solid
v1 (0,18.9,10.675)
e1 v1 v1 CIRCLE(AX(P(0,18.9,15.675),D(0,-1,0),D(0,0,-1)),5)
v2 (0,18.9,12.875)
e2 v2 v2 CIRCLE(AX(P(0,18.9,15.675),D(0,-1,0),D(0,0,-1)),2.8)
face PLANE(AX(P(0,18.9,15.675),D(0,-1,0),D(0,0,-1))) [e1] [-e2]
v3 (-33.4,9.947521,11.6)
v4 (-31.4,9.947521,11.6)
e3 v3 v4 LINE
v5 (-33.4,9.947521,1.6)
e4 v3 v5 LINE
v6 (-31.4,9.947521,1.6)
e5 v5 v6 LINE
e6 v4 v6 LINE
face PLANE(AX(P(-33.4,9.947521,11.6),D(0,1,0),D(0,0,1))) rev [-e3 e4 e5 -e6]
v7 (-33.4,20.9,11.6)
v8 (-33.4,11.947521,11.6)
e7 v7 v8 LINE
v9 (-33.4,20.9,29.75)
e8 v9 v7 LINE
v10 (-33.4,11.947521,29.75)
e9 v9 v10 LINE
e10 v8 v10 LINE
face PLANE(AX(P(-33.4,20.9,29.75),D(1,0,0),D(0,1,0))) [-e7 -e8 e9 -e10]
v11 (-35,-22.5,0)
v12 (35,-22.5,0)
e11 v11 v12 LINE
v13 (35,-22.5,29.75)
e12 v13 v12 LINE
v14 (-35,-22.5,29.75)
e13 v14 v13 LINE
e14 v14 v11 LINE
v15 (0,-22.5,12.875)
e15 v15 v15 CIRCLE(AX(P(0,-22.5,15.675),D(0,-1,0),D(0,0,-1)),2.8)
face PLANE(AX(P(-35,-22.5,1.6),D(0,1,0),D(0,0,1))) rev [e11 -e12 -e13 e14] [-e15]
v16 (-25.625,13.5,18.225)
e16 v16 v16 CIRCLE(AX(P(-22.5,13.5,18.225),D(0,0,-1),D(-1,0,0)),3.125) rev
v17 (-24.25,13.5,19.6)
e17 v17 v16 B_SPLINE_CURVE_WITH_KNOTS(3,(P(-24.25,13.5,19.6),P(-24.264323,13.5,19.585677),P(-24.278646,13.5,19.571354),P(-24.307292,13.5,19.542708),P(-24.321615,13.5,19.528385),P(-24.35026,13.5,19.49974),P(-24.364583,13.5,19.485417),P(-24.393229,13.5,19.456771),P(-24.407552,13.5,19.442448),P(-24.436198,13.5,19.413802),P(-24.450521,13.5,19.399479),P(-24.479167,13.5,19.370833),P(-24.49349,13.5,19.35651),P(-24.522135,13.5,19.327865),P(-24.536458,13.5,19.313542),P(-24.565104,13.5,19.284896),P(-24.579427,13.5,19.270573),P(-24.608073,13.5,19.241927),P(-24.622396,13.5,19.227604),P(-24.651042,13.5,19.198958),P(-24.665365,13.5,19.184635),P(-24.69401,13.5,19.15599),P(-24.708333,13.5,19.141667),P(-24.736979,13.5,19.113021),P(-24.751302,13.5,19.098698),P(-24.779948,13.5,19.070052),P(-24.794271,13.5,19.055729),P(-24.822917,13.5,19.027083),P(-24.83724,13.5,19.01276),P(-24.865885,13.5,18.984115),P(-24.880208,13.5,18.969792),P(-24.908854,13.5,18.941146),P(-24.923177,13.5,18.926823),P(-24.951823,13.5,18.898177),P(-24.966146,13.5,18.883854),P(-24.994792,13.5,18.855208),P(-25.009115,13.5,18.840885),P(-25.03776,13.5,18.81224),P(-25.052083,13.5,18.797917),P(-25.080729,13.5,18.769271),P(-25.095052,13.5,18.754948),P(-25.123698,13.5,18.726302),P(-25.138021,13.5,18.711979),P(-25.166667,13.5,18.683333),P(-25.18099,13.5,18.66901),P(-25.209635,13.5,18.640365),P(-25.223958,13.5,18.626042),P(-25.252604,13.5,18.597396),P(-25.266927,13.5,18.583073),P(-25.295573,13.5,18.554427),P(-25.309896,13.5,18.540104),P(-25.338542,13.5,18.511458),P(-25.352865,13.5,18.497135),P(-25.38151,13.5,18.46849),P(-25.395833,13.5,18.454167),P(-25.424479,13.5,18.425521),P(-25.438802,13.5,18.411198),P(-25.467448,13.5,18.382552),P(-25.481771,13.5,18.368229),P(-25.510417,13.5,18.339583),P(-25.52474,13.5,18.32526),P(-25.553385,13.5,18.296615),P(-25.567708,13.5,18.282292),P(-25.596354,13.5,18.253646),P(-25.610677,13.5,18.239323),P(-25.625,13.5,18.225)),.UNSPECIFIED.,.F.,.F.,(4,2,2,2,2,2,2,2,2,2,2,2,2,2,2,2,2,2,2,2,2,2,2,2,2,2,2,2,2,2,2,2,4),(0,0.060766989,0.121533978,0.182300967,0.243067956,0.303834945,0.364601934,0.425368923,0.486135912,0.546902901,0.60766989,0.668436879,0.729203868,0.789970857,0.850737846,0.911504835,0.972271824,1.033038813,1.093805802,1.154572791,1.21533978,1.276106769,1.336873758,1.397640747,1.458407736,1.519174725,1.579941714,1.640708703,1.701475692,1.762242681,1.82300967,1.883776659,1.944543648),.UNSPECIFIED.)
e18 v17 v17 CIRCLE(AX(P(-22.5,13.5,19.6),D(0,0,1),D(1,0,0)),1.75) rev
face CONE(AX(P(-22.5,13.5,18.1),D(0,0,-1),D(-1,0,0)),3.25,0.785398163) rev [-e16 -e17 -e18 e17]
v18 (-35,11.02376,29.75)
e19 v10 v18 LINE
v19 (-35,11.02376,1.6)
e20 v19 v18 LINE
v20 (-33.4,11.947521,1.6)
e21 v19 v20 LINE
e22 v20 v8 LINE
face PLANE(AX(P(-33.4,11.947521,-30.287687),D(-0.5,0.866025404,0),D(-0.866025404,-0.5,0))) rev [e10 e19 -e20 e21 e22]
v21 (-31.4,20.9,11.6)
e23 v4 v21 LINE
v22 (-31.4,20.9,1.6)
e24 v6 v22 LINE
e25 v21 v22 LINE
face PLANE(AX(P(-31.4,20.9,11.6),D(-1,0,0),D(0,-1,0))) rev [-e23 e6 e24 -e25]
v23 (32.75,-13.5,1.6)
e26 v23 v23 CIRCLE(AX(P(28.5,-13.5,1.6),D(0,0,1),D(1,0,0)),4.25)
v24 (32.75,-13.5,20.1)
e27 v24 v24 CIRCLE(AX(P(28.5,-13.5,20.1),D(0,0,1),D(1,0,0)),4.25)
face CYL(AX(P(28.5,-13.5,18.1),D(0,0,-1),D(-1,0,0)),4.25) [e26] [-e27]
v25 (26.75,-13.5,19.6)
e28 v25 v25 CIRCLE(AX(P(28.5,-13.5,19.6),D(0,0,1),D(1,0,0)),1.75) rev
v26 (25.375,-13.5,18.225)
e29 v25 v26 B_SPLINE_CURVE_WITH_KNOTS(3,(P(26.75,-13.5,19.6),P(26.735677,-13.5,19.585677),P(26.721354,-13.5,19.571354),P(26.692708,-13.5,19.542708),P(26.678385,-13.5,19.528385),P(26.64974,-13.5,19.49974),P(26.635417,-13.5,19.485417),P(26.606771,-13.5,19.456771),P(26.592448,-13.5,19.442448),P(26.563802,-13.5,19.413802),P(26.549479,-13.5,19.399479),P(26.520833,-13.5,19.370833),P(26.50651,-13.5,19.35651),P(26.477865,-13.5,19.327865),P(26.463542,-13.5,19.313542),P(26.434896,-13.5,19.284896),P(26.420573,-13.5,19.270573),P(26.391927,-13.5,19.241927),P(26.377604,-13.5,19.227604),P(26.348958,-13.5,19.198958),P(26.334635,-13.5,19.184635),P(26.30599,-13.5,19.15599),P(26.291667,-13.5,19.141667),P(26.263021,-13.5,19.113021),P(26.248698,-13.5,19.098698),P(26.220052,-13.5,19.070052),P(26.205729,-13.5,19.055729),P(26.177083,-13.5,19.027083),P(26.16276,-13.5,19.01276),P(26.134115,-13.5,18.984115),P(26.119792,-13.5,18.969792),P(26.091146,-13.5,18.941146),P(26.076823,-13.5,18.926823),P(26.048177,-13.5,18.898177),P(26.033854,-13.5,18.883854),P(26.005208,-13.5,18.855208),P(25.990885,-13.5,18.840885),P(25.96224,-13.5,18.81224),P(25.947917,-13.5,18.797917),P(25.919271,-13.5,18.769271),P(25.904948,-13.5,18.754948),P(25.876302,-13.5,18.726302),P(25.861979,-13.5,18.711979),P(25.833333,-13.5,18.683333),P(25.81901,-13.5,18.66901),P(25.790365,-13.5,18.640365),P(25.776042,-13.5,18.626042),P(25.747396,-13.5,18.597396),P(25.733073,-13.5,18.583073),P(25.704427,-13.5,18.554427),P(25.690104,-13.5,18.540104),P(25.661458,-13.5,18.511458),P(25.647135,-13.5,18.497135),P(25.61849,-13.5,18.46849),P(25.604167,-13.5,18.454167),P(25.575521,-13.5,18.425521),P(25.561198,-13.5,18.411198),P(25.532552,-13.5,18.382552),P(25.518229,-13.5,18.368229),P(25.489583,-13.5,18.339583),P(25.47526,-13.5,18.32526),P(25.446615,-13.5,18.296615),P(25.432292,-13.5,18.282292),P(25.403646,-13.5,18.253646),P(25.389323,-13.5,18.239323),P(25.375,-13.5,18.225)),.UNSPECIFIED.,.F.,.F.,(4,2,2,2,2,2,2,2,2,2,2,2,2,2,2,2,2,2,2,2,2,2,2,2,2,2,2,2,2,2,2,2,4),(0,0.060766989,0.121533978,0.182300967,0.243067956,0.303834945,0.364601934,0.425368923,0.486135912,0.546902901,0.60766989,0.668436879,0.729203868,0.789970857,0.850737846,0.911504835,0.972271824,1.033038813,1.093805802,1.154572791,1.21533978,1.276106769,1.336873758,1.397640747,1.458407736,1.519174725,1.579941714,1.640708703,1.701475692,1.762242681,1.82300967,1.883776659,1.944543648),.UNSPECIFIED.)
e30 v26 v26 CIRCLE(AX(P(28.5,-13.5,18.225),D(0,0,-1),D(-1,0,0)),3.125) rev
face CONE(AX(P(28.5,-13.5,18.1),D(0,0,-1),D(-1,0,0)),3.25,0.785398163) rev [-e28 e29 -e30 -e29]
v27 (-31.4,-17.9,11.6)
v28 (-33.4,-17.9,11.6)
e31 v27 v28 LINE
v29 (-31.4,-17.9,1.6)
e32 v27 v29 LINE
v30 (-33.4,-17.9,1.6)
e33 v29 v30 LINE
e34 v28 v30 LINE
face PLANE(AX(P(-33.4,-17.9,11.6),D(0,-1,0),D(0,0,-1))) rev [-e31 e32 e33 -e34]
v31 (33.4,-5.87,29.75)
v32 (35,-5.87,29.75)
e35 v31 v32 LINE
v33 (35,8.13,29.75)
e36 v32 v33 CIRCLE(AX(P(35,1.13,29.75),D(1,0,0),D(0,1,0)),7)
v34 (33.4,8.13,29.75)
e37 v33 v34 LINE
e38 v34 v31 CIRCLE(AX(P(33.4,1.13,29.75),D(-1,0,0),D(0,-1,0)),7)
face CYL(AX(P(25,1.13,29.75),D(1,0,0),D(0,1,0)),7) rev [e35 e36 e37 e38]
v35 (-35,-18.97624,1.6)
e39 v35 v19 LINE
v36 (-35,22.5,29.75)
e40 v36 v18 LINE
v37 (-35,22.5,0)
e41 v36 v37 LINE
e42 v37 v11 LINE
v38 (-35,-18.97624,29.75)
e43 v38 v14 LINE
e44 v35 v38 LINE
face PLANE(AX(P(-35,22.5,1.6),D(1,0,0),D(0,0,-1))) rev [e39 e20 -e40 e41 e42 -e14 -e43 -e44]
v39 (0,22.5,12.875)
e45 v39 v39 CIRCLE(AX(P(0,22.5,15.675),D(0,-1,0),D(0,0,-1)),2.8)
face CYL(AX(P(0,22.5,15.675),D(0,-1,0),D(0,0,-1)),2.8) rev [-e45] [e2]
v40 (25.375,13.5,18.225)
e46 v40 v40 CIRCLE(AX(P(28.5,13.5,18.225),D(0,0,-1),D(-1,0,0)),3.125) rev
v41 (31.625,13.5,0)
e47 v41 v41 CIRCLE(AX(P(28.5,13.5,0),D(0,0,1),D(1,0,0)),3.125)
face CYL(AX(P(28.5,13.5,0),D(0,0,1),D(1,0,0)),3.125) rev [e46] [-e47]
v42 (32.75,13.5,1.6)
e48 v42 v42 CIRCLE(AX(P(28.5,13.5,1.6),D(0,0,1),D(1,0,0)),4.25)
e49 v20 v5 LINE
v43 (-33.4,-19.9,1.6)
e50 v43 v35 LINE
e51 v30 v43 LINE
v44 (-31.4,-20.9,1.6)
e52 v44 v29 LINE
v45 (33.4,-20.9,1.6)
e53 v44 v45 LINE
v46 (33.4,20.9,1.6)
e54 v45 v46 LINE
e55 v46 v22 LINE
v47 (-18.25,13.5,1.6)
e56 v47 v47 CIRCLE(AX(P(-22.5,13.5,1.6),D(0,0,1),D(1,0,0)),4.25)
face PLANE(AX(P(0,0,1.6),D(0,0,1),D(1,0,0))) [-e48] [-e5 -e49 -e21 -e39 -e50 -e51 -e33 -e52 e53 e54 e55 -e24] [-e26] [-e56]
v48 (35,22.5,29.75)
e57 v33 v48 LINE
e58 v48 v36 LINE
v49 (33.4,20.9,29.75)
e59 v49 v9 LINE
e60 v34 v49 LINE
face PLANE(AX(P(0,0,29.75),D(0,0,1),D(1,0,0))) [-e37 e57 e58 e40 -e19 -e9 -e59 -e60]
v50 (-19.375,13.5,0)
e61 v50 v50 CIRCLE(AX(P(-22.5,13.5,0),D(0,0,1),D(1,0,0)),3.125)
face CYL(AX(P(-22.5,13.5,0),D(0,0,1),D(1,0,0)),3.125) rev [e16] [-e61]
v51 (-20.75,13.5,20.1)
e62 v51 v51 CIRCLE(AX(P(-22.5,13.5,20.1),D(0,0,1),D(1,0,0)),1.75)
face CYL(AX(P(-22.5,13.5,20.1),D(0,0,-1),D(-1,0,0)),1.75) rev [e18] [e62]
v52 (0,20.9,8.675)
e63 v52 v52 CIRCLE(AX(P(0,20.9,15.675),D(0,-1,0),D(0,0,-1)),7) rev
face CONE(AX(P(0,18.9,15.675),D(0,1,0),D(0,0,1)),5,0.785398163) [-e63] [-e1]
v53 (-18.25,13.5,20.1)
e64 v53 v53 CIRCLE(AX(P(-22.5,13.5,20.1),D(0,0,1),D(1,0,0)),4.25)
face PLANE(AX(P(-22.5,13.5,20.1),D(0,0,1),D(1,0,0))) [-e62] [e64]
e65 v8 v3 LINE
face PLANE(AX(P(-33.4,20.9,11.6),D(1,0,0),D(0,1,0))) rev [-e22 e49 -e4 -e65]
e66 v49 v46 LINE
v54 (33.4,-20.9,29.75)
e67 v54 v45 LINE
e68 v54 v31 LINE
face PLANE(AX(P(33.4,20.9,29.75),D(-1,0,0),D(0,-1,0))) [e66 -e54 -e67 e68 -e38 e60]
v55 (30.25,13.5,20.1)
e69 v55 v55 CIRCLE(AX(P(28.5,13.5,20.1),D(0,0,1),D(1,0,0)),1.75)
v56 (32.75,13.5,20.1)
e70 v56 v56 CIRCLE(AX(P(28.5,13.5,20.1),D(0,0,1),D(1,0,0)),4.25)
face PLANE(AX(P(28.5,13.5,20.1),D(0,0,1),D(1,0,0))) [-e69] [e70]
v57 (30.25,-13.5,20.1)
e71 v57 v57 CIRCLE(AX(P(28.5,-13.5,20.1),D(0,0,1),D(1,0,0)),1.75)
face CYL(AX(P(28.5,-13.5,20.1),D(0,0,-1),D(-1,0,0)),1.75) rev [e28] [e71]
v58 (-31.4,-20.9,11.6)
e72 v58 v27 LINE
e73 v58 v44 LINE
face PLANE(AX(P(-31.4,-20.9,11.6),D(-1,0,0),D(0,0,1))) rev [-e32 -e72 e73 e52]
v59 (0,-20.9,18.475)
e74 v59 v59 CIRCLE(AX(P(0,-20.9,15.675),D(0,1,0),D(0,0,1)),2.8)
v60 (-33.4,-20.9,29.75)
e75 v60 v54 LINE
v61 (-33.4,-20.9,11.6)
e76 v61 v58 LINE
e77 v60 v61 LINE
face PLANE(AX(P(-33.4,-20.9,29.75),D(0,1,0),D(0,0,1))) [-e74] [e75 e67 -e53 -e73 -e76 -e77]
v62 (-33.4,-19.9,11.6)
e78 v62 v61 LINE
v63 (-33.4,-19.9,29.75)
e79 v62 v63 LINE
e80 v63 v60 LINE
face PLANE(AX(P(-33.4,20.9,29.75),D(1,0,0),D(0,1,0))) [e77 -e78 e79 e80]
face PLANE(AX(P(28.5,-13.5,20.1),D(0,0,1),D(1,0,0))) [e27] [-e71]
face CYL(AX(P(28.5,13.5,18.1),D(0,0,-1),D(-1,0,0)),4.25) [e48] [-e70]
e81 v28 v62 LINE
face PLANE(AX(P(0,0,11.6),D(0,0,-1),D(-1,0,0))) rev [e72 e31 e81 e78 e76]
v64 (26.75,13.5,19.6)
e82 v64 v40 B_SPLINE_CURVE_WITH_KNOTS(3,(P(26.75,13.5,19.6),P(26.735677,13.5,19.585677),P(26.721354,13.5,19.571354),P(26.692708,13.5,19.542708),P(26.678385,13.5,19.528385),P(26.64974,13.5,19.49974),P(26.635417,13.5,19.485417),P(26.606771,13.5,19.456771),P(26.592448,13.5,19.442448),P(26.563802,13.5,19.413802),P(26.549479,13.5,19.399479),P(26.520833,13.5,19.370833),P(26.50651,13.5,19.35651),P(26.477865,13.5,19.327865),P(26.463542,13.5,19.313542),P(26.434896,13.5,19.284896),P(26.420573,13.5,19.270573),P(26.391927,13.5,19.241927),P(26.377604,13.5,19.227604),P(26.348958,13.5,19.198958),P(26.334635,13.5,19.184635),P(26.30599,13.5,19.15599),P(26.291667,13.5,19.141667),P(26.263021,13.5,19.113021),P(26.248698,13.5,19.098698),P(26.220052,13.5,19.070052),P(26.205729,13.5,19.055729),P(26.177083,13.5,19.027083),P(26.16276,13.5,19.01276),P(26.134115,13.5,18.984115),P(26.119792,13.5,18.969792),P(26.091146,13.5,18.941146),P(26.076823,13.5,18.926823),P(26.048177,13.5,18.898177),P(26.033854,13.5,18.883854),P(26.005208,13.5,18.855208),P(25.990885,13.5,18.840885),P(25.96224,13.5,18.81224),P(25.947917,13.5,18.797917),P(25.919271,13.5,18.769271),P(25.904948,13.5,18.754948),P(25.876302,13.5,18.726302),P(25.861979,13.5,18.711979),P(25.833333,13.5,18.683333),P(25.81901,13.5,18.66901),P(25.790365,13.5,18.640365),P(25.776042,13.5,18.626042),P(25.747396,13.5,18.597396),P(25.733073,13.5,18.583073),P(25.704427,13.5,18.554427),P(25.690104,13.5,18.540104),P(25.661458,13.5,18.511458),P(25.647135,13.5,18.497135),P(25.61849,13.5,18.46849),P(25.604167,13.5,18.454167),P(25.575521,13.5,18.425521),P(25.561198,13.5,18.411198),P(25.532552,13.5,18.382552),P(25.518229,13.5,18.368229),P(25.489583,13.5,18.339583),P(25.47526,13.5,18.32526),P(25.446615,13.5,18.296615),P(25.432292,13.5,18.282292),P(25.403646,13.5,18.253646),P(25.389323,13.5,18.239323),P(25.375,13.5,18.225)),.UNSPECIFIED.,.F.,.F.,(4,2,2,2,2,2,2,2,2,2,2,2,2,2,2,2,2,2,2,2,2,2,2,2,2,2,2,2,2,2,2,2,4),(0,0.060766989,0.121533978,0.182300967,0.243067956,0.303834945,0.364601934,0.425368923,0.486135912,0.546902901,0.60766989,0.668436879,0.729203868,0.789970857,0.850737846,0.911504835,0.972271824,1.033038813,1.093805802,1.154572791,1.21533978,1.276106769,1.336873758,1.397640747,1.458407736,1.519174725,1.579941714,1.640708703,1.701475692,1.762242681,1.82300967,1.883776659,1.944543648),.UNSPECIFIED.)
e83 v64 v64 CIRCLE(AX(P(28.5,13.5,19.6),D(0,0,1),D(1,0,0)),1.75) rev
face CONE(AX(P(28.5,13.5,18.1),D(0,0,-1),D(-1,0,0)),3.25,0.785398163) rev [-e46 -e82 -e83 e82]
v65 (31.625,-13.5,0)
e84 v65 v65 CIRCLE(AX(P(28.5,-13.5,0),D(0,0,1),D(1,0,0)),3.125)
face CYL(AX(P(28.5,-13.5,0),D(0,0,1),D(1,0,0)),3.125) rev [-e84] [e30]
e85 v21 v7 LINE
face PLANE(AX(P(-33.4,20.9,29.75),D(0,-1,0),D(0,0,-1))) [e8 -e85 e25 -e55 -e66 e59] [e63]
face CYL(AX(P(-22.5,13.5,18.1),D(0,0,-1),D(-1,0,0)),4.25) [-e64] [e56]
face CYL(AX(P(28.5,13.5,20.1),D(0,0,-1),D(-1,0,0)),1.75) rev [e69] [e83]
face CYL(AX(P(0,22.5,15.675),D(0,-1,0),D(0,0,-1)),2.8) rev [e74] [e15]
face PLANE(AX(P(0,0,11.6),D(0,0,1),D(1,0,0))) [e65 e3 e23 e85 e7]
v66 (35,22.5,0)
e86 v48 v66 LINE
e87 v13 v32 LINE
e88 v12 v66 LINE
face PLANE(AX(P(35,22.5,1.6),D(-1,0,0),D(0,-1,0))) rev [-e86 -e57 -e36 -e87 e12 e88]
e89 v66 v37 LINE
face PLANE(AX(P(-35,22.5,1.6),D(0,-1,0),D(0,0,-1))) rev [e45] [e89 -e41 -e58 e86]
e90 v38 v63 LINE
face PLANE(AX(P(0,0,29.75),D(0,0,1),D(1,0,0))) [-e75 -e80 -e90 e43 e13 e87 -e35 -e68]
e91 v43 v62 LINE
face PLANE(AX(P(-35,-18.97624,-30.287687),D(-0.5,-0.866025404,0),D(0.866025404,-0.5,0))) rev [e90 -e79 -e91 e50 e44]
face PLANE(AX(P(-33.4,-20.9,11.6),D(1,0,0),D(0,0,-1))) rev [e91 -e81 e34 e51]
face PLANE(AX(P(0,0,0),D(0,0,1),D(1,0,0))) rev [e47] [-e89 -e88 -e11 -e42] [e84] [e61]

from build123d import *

# Parameters (mm, degrees)
SKETCH2_W               = 70
SKETCH2_H               = 45
BOSS_EXTRUDE1_DEPTH     = 1.6
SKETCH3_R               = 3.125
CUT_EXTRUDE1_DEPTH      = 1.6
SKETCH4_W               = 70
SKETCH4_H               = 45
SKETCH4_W_2             = 66.8
SKETCH4_H_2             = 41.8
BOSS_EXTRUDE2_DEPTH     = 28.15
BOSS_EXTRUDE3_START     = 16.5
SKETCH5_R               = 4.25
SKETCH5_R_2             = 3.125
BOSS_EXTRUDE3_DEPTH     = 16.5
BOSS_EXTRUDE4_START     = 2
SKETCH6_R               = 4.25
SKETCH6_R_2             = 1.75
BOSS_EXTRUDE4_DEPTH     = 2
CHAMFER1_SIZE           = 1.5
SKETCH7_R               = 7
CUT_EXTRUDE2_DEPTH      = 10
CUT_EXTRUDE3_DEPTH      = 28.15
CUT_EXTRUDE4_DEPTH      = 64.195114526
CUT_EXTRUDE4_DEPTH_BACK = 64.195114526
SKETCH9_R               = 2.8
SKETCH10_R              = 5
SKETCH10_R_2            = 2.8
BOSS_EXTRUDE5_DEPTH     = 2
CHAMFER2_SIZE           = 2
SKETCH11_W              = 2
SKETCH11_H              = 3
SKETCH11_H_2            = 10.952479139
BOSS_EXTRUDE6_DEPTH     = 10


# Some blends are built 0.0001 mm under size
with BuildPart() as part:
    # Sketch2 → Boss-Extrude1 (new body)
    with BuildSketch(Plane.XY):
        Rectangle(SKETCH2_W, SKETCH2_H)
    extrude(amount=BOSS_EXTRUDE1_DEPTH)

    # Sketch3 → Cut-Extrude1 (cut)
    with BuildSketch(Plane.XY.offset(1.6)):
        with Locations((-22.5, 13.5)):
            Circle(SKETCH3_R)
        with Locations((28.5, 13.5)):
            Circle(SKETCH3_R)
        with Locations((28.5, -13.5)):
            Circle(SKETCH3_R)
    extrude(amount=-CUT_EXTRUDE1_DEPTH, mode=Mode.SUBTRACT)

    # Sketch4 → Boss-Extrude2 (add)
    with BuildSketch(Plane.XY.offset(1.6)):
        Rectangle(SKETCH4_W, SKETCH4_H)
        Rectangle(SKETCH4_W_2, SKETCH4_H_2, mode=Mode.SUBTRACT)
    extrude(amount=BOSS_EXTRUDE2_DEPTH)

    # Sketch5 → Boss-Extrude3 (add)
    # profile 1 of 3: a face of its own
    with BuildSketch(Plane.XY.offset(1.6).offset(BOSS_EXTRUDE3_START)):
        with Locations((-22.5, 13.5)):
            Circle(SKETCH5_R)
        with Locations((-22.5, 13.5)):
            Circle(SKETCH5_R_2, mode=Mode.SUBTRACT)
    # profile 2 of 3: a face of its own
    with BuildSketch(Plane.XY.offset(1.6).offset(BOSS_EXTRUDE3_START)):
        with Locations((28.5, 13.5)):
            Circle(SKETCH5_R)
        with Locations((28.5, 13.5)):
            Circle(SKETCH5_R_2, mode=Mode.SUBTRACT)
    # profile 3 of 3: a face of its own
    with BuildSketch(Plane.XY.offset(1.6).offset(BOSS_EXTRUDE3_START)):
        with Locations((28.5, -13.5)):
            Circle(SKETCH5_R)
        with Locations((28.5, -13.5)):
            Circle(SKETCH5_R_2, mode=Mode.SUBTRACT)
    extrude(amount=-BOSS_EXTRUDE3_DEPTH)

    # Sketch6 → Boss-Extrude4 (add)
    # profile 1 of 3: a face of its own
    with BuildSketch(Plane.XY.offset(18.1).offset(BOSS_EXTRUDE4_START)):
        with Locations((28.5, -13.5)):
            Circle(SKETCH6_R)
        with Locations((28.5, -13.5)):
            Circle(SKETCH6_R_2, mode=Mode.SUBTRACT)
    # profile 2 of 3: a face of its own
    with BuildSketch(Plane.XY.offset(18.1).offset(BOSS_EXTRUDE4_START)):
        with Locations((28.5, 13.5)):
            Circle(SKETCH6_R)
        with Locations((28.5, 13.5)):
            Circle(SKETCH6_R_2, mode=Mode.SUBTRACT)
    # profile 3 of 3: a face of its own
    with BuildSketch(Plane.XY.offset(18.1).offset(BOSS_EXTRUDE4_START)):
        with Locations((-22.5, 13.5)):
            Circle(SKETCH6_R)
        with Locations((-22.5, 13.5)):
            Circle(SKETCH6_R_2, mode=Mode.SUBTRACT)
    extrude(amount=-BOSS_EXTRUDE4_DEPTH)

    # Chamfer1
    # the kernel refuses this chamfer: 1.5 mm, written as the material it takes off along each edge
    with BuildSketch(Plane(origin=(28.5, 13.5, 18.1), x_dir=(1, 0, 0), z_dir=(0, -1, 0))) as chamfer1_piece_1_section:
        Polygon((1.75, CHAMFER1_SIZE), (1.75 + CHAMFER1_SIZE, 0), (1.75, 0), align=None)
    chamfer1_piece_1 = revolve(axis=Axis((28.5, 13.5, 18.1), (0, 0, 1)), mode=Mode.PRIVATE)
    chamfer1_piece_1 = chamfer1_piece_1 & Plane(origin=(28.5, 13.5, 18.915495492), x_dir=(1, 0, 0), z_dir=(0, 0, 1)) * Cylinder(3.125, 13, mode=Mode.PRIVATE)
    add(chamfer1_piece_1, mode=Mode.SUBTRACT)
    with BuildSketch(Plane(origin=(28.5, -13.5, 18.1), x_dir=(1, 0, 0), z_dir=(0, -1, 0))) as chamfer1_piece_2_section:
        Polygon((1.75, CHAMFER1_SIZE), (1.75 + CHAMFER1_SIZE, 0), (1.75, 0), align=None)
    chamfer1_piece_2 = revolve(axis=Axis((28.5, -13.5, 18.1), (0, 0, 1)), mode=Mode.PRIVATE)
    chamfer1_piece_2 = chamfer1_piece_2 & Plane(origin=(28.5, -13.5, 18.915495492), x_dir=(1, 0, 0), z_dir=(0, 0, 1)) * Cylinder(3.125, 13, mode=Mode.PRIVATE)
    add(chamfer1_piece_2, mode=Mode.SUBTRACT)
    with BuildSketch(Plane(origin=(-22.5, 13.5, 18.1), x_dir=(1, 0, 0), z_dir=(0, -1, 0))) as chamfer1_piece_3_section:
        Polygon((1.75 + CHAMFER1_SIZE, 0), (1.75, CHAMFER1_SIZE), (1.75, 0), align=None)
    chamfer1_piece_3 = revolve(axis=Axis((-22.5, 13.5, 18.1), (0, 0, 1)), mode=Mode.PRIVATE)
    chamfer1_piece_3 = chamfer1_piece_3 & Plane(origin=(-22.5, 13.5, 18.915495492), x_dir=(1, 0, 0), z_dir=(0, 0, 1)) * Cylinder(3.125, 13, mode=Mode.PRIVATE)
    add(chamfer1_piece_3, mode=Mode.SUBTRACT)

    # Sketch7 → Cut-Extrude2 (cut)
    with BuildSketch(Plane(origin=(35, 0, 0), x_dir=(0, 0, -1), z_dir=(1, 0, 0))):
        with Locations((-29.75, 1.13)):
            Circle(SKETCH7_R)
    extrude(amount=-CUT_EXTRUDE2_DEPTH, mode=Mode.SUBTRACT)

    # Sketch8 → Cut-Extrude3 (cut)
    with BuildSketch(Plane.XY.offset(29.75)):
        Polygon((-35, -18.976239569), (-33.4, -19.9), (-33.4, 11.947520861), (-35, 11.023760431), align=None)
    extrude(amount=-CUT_EXTRUDE3_DEPTH, mode=Mode.SUBTRACT)

    # Sketch9 → Cut-Extrude4 (cut, two sides: drawn at the far end of the back side and taken through both)
    with BuildSketch(Plane.XZ.offset(-20.9).offset(-CUT_EXTRUDE4_DEPTH_BACK)):
        with Locations(Location((0, 15.675, 0), (0, 0, 270))):
            Circle(SKETCH9_R)
    extrude(amount=CUT_EXTRUDE4_DEPTH + CUT_EXTRUDE4_DEPTH_BACK, mode=Mode.SUBTRACT)

    # Sketch10 → Boss-Extrude5 (add)
    with BuildSketch(Plane.XZ.offset(-20.9)):
        with Locations(Location((0, 15.675, 0), (0, 0, 270))):
            Circle(SKETCH10_R)
        with Locations(Location((0, 15.675, 0), (0, 0, 270))):
            Circle(SKETCH10_R_2, mode=Mode.SUBTRACT)
    extrude(amount=BOSS_EXTRUDE5_DEPTH)

    # Chamfer2
    chamfer2_edges = [part.edges().sort_by_distance(p)[0] for p in [
        (0, 20.9, 20.675),
    ]]
    chamfer(chamfer2_edges, length=CHAMFER2_SIZE - 0.0001)  # a hair under: the kernel refuses the full size

    # Sketch11 → Boss-Extrude6 (add)
    with BuildSketch(Plane.XY.offset(1.6)):
        with Locations((-32.4, -19.4)):
            Rectangle(SKETCH11_W, SKETCH11_H)
        with Locations((-32.4, 15.423760431)):
            Rectangle(SKETCH11_W, SKETCH11_H_2)
    extrude(amount=BOSS_EXTRUDE6_DEPTH)


solid = part.part
